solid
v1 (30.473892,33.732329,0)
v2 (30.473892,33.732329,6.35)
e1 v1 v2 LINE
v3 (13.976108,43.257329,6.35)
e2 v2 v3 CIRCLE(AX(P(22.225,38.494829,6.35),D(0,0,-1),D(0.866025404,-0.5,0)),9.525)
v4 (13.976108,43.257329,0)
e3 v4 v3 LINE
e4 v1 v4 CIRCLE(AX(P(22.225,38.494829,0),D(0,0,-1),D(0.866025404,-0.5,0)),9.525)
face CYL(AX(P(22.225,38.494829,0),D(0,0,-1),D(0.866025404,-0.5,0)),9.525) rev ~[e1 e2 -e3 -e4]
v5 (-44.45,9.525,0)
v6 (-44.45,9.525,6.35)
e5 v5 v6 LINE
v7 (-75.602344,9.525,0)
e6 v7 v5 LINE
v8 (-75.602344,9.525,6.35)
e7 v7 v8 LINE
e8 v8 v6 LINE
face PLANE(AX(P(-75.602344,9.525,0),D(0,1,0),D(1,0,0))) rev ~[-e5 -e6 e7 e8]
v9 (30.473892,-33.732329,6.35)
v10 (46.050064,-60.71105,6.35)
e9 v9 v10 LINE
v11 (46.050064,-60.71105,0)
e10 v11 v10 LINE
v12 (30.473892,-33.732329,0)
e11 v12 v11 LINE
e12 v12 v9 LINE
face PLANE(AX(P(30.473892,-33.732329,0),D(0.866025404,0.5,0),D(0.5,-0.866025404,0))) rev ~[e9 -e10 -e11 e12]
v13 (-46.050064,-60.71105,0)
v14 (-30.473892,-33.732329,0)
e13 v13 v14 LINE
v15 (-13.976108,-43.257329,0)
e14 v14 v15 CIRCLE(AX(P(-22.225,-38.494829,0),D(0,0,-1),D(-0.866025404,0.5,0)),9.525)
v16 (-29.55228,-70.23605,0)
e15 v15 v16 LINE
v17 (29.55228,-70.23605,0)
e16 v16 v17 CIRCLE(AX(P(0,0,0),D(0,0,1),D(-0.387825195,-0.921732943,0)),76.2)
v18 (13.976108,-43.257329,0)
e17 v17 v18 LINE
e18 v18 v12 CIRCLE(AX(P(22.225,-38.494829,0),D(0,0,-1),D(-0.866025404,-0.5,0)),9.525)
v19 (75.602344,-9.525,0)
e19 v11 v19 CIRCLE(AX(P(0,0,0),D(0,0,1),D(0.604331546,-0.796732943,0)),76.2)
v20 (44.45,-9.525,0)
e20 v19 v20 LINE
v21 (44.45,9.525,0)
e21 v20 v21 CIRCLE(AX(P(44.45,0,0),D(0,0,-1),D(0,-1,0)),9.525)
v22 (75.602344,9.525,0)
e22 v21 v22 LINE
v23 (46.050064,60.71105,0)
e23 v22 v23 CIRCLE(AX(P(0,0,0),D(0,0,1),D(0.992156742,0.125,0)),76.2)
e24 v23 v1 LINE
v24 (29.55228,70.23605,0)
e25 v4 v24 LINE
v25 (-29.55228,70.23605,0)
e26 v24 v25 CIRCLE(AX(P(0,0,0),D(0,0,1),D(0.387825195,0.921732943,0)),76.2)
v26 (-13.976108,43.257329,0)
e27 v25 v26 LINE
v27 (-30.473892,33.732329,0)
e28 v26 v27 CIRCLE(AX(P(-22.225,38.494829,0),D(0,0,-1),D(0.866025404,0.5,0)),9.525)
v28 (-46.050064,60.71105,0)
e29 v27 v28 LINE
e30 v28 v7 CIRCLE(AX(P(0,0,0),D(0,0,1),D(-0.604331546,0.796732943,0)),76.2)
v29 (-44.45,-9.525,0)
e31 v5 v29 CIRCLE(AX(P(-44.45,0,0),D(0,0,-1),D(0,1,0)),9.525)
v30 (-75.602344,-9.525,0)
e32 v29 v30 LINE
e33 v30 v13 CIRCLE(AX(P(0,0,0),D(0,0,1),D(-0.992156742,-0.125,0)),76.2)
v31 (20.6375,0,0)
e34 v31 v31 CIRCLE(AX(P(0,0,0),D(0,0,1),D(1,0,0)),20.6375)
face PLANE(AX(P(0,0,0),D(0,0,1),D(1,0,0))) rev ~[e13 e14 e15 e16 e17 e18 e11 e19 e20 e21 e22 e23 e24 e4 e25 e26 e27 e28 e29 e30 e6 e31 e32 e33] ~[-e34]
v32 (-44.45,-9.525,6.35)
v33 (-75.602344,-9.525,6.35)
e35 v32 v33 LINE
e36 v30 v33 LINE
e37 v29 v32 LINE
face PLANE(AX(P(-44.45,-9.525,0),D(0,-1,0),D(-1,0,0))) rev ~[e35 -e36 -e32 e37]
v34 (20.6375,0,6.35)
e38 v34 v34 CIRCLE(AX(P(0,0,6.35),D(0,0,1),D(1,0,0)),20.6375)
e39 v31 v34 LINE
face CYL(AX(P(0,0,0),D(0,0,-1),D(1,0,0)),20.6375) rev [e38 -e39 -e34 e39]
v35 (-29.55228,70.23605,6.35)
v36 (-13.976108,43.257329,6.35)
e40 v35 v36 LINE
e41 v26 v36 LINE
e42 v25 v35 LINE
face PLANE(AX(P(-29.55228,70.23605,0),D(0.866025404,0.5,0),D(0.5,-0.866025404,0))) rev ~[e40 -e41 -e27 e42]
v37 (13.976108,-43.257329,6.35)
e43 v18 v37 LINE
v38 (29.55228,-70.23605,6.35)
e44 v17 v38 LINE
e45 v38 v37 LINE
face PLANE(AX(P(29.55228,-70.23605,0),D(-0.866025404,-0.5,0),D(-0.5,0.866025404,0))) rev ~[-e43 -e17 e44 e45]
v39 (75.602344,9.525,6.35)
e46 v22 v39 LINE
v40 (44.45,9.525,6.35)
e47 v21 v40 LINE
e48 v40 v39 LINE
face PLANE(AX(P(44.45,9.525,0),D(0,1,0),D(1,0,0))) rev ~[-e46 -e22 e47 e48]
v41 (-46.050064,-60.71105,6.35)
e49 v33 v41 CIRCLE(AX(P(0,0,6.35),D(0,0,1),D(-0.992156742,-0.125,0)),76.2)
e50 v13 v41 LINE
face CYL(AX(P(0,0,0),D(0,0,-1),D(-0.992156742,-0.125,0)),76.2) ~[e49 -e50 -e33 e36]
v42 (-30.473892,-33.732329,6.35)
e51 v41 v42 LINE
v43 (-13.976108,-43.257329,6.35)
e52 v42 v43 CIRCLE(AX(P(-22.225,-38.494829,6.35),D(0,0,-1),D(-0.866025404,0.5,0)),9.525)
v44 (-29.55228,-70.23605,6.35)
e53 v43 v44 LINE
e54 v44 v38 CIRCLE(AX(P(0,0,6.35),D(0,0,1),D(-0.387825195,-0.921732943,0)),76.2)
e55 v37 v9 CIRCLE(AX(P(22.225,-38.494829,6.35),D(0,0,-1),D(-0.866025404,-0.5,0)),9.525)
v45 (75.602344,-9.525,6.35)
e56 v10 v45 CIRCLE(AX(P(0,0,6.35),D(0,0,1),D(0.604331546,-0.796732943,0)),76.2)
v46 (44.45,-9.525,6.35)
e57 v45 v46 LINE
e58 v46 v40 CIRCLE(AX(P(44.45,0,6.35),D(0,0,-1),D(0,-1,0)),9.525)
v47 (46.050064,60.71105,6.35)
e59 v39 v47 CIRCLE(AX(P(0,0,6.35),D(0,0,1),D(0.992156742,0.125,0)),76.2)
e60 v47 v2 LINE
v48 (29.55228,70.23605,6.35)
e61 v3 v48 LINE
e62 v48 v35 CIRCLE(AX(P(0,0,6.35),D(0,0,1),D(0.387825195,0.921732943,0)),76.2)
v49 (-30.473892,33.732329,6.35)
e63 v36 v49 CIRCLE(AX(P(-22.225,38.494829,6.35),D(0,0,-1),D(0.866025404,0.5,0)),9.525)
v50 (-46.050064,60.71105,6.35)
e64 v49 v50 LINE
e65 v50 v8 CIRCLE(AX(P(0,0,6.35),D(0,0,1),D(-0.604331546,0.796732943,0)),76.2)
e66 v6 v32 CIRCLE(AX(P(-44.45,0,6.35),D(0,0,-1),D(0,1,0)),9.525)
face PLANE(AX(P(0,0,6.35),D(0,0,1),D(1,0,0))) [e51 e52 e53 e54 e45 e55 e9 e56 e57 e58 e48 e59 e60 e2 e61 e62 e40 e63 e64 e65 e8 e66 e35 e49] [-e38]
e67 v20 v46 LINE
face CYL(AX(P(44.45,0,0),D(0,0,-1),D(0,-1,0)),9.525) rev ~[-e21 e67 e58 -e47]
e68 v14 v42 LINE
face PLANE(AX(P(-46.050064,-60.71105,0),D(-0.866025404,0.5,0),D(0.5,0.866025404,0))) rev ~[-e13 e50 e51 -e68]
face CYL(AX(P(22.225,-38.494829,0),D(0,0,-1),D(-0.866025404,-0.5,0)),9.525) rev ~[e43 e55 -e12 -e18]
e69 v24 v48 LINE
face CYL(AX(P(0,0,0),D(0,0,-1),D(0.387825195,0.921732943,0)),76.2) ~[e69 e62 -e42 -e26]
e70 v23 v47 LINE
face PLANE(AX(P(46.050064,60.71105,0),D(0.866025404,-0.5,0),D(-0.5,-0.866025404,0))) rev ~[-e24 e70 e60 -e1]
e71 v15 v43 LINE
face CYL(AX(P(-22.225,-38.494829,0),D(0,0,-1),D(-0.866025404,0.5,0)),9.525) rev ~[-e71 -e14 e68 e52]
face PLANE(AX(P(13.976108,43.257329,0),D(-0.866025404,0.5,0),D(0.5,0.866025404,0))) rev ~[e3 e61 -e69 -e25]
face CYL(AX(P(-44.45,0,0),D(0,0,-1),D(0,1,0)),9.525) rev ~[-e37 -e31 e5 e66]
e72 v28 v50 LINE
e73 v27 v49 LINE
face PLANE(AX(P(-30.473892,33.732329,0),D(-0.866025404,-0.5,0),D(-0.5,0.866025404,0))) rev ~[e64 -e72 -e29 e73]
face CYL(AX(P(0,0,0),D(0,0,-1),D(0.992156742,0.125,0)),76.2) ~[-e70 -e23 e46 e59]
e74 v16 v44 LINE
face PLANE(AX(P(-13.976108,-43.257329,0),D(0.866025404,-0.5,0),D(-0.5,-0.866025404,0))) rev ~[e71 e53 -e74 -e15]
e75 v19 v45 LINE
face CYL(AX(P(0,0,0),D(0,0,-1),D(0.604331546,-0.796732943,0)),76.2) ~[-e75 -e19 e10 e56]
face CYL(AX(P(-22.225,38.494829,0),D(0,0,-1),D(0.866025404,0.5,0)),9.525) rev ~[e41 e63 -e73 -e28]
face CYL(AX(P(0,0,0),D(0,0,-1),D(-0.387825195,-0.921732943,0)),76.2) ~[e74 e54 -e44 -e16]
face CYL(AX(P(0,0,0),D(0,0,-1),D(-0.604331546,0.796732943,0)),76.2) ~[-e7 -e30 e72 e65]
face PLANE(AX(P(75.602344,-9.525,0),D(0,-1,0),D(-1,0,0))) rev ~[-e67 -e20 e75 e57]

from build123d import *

# Parameters (mm, degrees)
F0_R     = 20.6375
F1_DEPTH = 6.35


# Not quite as in the source:
# - a feature names something its author has since deleted; it is built from what else it names


with BuildPart() as f1:
    # F0 (on Top) → F1 (new body)
    with BuildSketch(Plane.XY):
        with BuildLine():
            Line((-44.45, -9.525), (-75.6023437137, -9.525))
            ThreePointArc((-75.6023437137, -9.525), (-65.9911357684, -38.1), (-46.0500638279, -60.7110502417))
            Line((-46.0500638279, -60.7110502417), (-30.473891971, -33.7323291982))
            ThreePointArc((-30.473891971, -33.7323291982), (-17.4625, -30.2459372272), (-13.976108029, -43.2573291982))
            Line((-13.976108029, -43.2573291982), (-29.5522798858, -70.2360502417))
            ThreePointArc((-29.5522798858, -70.2360502417), (0, -76.2), (29.5522798858, -70.2360502417))
            Line((29.5522798858, -70.2360502417), (13.976108029, -43.2573291982))
            ThreePointArc((13.976108029, -43.2573291982), (17.4625, -30.2459372272), (30.473891971, -33.7323291982))
            Line((30.473891971, -33.7323291982), (46.0500638279, -60.7110502417))
            ThreePointArc((46.0500638279, -60.7110502417), (65.9911357684, -38.1), (75.6023437137, -9.525))
            Line((75.6023437137, -9.525), (44.45, -9.525))
            ThreePointArc((44.45, -9.525), (34.925, 0), (44.45, 9.525))
            Line((44.45, 9.525), (75.6023437137, 9.525))
            ThreePointArc((75.6023437137, 9.525), (65.9911357684, 38.1), (46.0500638279, 60.7110502417))
            Line((46.0500638279, 60.7110502417), (30.473891971, 33.7323291982))
            ThreePointArc((30.473891971, 33.7323291982), (17.4625, 30.2459372272), (13.976108029, 43.2573291982))
            Line((13.976108029, 43.2573291982), (29.5522798858, 70.2360502417))
            ThreePointArc((29.5522798858, 70.2360502417), (0, 76.2), (-29.5522798858, 70.2360502417))
            Line((-29.5522798858, 70.2360502417), (-13.976108029, 43.2573291982))
            ThreePointArc((-13.976108029, 43.2573291982), (-17.4625, 30.2459372272), (-30.473891971, 33.7323291982))
            Line((-30.473891971, 33.7323291982), (-46.0500638279, 60.7110502417))
            ThreePointArc((-46.0500638279, 60.7110502417), (-65.9911357684, 38.1), (-75.6023437137, 9.525))
            Line((-75.6023437137, 9.525), (-44.45, 9.525))
            ThreePointArc((-44.45, 9.525), (-34.925, 0), (-44.45, -9.525))
        make_face()
        Circle(F0_R, mode=Mode.SUBTRACT)
    extrude(amount=F1_DEPTH)


solid = f1.part
